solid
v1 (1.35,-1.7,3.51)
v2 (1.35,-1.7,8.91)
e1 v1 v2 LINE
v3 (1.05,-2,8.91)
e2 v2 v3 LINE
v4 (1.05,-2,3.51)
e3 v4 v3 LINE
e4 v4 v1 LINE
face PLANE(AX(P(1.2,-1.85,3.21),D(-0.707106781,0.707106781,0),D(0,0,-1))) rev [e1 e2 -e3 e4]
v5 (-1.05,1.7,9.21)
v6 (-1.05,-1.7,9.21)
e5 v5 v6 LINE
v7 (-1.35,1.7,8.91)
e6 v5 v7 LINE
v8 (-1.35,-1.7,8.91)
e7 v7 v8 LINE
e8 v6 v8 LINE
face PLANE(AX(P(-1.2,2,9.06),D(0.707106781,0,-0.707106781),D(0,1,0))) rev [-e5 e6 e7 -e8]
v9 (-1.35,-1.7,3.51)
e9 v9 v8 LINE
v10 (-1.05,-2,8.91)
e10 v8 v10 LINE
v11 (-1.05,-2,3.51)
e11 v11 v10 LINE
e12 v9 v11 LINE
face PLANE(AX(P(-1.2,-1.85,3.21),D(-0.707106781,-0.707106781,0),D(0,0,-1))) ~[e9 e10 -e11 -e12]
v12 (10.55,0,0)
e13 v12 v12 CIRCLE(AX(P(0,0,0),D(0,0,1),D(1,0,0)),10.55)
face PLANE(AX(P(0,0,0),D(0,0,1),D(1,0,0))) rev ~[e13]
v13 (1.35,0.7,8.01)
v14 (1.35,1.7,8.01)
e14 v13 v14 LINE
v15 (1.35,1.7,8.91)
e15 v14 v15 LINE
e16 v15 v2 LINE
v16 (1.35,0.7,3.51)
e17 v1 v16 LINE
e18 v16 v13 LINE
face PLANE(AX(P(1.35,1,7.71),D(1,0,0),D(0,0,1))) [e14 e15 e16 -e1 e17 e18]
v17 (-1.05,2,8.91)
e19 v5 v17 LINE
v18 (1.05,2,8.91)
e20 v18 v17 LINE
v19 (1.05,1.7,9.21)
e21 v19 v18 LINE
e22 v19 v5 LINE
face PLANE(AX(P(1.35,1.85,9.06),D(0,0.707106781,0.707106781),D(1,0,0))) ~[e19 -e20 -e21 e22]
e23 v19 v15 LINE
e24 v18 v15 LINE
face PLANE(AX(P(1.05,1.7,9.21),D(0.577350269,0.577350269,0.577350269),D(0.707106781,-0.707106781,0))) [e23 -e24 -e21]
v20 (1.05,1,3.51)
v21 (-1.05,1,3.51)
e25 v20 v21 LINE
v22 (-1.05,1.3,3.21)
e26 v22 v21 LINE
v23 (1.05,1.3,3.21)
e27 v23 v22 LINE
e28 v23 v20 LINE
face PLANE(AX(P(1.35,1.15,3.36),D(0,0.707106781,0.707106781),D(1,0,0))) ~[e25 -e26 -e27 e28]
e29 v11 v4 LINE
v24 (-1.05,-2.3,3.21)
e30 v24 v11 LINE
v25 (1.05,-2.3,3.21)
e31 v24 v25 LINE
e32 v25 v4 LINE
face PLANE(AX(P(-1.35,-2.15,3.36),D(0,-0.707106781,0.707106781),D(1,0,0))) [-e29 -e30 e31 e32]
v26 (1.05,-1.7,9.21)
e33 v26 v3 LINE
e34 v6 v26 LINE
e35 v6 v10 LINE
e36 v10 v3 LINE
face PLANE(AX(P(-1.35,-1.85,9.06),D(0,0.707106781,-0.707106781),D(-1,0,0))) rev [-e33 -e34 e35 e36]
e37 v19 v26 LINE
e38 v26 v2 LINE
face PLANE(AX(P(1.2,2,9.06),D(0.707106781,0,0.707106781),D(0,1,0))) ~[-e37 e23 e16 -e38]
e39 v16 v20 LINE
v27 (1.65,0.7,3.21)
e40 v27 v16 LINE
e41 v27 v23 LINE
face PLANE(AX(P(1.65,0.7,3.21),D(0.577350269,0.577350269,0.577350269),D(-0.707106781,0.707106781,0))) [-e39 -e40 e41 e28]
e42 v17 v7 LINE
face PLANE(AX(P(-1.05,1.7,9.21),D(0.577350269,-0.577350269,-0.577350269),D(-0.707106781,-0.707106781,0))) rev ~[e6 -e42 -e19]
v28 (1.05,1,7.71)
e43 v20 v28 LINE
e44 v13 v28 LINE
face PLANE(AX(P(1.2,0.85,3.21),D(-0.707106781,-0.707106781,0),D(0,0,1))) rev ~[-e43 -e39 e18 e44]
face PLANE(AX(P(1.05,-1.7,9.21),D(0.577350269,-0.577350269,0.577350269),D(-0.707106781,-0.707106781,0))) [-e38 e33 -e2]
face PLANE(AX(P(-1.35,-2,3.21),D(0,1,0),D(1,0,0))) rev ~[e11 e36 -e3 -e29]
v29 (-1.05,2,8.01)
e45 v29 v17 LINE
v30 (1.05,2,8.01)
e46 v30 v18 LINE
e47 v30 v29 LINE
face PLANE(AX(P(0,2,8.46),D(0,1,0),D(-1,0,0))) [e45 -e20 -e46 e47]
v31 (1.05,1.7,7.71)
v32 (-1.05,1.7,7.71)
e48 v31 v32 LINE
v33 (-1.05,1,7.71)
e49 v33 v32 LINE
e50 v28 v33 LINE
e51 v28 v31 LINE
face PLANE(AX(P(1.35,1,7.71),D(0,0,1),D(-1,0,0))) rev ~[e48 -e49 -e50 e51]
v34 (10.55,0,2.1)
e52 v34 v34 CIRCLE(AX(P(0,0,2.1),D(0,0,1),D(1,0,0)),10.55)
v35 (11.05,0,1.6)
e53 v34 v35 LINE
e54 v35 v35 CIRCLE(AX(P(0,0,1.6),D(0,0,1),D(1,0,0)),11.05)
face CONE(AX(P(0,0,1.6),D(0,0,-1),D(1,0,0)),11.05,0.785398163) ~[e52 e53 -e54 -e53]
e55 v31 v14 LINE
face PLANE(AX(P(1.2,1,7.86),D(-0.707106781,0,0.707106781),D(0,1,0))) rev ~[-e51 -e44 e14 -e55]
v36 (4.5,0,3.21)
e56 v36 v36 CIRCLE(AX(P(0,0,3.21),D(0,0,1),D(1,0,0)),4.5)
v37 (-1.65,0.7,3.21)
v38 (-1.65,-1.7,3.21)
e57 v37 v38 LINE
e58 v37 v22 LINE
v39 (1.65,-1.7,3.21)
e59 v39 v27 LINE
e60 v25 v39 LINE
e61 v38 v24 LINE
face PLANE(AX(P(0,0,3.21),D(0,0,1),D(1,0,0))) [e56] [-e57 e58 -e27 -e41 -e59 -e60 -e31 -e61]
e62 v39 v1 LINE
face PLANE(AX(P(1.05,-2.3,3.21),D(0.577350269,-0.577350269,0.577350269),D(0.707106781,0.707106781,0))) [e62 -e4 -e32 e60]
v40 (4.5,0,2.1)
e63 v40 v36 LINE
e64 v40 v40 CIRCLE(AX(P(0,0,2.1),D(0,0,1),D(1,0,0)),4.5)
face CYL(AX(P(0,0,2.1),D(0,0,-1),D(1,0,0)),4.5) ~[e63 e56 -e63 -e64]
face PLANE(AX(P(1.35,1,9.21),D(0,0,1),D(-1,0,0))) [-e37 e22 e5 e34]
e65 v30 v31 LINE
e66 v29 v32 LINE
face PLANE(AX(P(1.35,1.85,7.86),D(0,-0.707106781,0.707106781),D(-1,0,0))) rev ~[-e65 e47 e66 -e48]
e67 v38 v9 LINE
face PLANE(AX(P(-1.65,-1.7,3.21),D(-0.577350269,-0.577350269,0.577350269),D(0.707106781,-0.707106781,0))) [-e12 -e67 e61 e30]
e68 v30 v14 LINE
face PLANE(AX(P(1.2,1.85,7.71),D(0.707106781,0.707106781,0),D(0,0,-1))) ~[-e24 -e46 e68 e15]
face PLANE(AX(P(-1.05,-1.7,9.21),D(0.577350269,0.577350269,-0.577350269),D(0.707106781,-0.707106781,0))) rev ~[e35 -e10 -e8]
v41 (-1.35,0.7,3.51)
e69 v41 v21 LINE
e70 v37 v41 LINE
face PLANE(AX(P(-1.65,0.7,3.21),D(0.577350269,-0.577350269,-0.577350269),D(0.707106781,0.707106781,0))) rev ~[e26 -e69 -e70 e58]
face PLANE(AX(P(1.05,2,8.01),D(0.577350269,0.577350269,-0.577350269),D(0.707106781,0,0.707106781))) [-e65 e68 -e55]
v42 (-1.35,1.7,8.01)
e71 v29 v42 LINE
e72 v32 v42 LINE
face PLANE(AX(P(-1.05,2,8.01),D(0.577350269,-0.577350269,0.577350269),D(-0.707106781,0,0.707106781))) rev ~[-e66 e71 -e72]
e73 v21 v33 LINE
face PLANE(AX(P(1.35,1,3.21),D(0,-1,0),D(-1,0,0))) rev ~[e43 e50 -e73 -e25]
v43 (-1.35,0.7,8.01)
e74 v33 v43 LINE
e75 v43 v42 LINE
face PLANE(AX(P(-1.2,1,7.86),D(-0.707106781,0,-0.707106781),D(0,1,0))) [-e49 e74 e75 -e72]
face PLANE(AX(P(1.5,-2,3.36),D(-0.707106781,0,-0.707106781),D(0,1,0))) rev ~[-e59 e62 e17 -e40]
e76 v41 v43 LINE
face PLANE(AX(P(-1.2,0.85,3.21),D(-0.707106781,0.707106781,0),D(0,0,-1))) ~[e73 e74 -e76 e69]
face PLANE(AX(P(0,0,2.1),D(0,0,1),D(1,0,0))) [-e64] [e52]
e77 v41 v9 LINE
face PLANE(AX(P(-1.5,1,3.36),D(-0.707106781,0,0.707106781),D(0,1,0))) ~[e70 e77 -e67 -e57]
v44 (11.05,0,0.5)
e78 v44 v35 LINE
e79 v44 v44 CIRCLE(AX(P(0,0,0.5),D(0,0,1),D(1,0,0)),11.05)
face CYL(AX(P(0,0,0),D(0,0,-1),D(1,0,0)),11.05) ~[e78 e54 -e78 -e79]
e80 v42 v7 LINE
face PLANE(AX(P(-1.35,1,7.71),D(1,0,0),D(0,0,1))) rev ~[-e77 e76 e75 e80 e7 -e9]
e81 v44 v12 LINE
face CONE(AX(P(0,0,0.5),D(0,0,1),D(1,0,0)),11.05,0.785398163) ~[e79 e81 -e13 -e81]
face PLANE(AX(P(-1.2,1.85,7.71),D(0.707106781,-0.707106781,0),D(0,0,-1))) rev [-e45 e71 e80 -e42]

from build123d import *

# Parameters (mm, degrees)
F0_R     = 11.05
F1_DEPTH = 2.1
F2_R     = 4.5
F3_DEPTH = 1.11
F6_DEPTH = 6
F7_W     = 2.7
F7_H     = 1.5
F8_DEPTH = 1
F9_SIZE  = 0.3
F10_SIZE = 0.5


# Not quite as in the source:
# - two fillets or chamfers of one size are made in one step


with BuildPart() as f1:
    # F0 (on Top) → F1 (new body)
    with BuildSketch(Plane.XY):
        Circle(F0_R)
    extrude(amount=F1_DEPTH)

    # F2 (on face) → F3 (join)
    with BuildSketch(Plane.XY.offset(2.1)):
        Circle(F2_R)
    extrude(amount=F3_DEPTH)

    # F5 (on face) → F6 (join)
    with BuildSketch(Plane.XY.offset(3.21)):
        Polygon((-1.35, -2), (1.35, -2), (1.35, 0), (1.35, 1), (-1.35, 1), (-1.35, 0), align=None)
    extrude(amount=F6_DEPTH)

    # F7 (on face) → F8 (join)
    with BuildSketch(Plane(origin=(0, 1, 0), x_dir=(-1, 0, 0), z_dir=(0, 1, 0))):
        with Locations((0, 8.46)):
            Rectangle(F7_W, F7_H)
    extrude(amount=F8_DEPTH)

    # F9
    f9_edges = [f1.edges().sort_by_distance(p)[0] for p in [
        (-1.35, -2, 6.21),
        (1.35, -2, 6.21),
        (1.35, 1, 5.46),
        (-1.35, 1, 5.46),
        (1.35, 1.5, 7.71),
        (-1.35, 1.5, 7.71),
        (0, 2, 7.71),
        (1.35, 2, 8.46),
        (-1.35, 2, 8.46),
        (0, 2, 9.21),
        (1.35, 0, 9.21),
        (-1.35, 0, 9.21),
        (0, -2, 9.21),
        (-1.35, -0.5, 3.21),
        (0, -2, 3.21),
        (1.35, -0.5, 3.21),
        (0, 1, 3.21),
    ]]
    chamfer(f9_edges, length=F9_SIZE)

    # F10
    f10_edges = [f1.edges().sort_by_distance(p)[0] for p in [
        (-11.05, 0, 0),
        (-11.05, 0, 2.1),
    ]]
    chamfer(f10_edges, length=F10_SIZE)


solid = f1.part
